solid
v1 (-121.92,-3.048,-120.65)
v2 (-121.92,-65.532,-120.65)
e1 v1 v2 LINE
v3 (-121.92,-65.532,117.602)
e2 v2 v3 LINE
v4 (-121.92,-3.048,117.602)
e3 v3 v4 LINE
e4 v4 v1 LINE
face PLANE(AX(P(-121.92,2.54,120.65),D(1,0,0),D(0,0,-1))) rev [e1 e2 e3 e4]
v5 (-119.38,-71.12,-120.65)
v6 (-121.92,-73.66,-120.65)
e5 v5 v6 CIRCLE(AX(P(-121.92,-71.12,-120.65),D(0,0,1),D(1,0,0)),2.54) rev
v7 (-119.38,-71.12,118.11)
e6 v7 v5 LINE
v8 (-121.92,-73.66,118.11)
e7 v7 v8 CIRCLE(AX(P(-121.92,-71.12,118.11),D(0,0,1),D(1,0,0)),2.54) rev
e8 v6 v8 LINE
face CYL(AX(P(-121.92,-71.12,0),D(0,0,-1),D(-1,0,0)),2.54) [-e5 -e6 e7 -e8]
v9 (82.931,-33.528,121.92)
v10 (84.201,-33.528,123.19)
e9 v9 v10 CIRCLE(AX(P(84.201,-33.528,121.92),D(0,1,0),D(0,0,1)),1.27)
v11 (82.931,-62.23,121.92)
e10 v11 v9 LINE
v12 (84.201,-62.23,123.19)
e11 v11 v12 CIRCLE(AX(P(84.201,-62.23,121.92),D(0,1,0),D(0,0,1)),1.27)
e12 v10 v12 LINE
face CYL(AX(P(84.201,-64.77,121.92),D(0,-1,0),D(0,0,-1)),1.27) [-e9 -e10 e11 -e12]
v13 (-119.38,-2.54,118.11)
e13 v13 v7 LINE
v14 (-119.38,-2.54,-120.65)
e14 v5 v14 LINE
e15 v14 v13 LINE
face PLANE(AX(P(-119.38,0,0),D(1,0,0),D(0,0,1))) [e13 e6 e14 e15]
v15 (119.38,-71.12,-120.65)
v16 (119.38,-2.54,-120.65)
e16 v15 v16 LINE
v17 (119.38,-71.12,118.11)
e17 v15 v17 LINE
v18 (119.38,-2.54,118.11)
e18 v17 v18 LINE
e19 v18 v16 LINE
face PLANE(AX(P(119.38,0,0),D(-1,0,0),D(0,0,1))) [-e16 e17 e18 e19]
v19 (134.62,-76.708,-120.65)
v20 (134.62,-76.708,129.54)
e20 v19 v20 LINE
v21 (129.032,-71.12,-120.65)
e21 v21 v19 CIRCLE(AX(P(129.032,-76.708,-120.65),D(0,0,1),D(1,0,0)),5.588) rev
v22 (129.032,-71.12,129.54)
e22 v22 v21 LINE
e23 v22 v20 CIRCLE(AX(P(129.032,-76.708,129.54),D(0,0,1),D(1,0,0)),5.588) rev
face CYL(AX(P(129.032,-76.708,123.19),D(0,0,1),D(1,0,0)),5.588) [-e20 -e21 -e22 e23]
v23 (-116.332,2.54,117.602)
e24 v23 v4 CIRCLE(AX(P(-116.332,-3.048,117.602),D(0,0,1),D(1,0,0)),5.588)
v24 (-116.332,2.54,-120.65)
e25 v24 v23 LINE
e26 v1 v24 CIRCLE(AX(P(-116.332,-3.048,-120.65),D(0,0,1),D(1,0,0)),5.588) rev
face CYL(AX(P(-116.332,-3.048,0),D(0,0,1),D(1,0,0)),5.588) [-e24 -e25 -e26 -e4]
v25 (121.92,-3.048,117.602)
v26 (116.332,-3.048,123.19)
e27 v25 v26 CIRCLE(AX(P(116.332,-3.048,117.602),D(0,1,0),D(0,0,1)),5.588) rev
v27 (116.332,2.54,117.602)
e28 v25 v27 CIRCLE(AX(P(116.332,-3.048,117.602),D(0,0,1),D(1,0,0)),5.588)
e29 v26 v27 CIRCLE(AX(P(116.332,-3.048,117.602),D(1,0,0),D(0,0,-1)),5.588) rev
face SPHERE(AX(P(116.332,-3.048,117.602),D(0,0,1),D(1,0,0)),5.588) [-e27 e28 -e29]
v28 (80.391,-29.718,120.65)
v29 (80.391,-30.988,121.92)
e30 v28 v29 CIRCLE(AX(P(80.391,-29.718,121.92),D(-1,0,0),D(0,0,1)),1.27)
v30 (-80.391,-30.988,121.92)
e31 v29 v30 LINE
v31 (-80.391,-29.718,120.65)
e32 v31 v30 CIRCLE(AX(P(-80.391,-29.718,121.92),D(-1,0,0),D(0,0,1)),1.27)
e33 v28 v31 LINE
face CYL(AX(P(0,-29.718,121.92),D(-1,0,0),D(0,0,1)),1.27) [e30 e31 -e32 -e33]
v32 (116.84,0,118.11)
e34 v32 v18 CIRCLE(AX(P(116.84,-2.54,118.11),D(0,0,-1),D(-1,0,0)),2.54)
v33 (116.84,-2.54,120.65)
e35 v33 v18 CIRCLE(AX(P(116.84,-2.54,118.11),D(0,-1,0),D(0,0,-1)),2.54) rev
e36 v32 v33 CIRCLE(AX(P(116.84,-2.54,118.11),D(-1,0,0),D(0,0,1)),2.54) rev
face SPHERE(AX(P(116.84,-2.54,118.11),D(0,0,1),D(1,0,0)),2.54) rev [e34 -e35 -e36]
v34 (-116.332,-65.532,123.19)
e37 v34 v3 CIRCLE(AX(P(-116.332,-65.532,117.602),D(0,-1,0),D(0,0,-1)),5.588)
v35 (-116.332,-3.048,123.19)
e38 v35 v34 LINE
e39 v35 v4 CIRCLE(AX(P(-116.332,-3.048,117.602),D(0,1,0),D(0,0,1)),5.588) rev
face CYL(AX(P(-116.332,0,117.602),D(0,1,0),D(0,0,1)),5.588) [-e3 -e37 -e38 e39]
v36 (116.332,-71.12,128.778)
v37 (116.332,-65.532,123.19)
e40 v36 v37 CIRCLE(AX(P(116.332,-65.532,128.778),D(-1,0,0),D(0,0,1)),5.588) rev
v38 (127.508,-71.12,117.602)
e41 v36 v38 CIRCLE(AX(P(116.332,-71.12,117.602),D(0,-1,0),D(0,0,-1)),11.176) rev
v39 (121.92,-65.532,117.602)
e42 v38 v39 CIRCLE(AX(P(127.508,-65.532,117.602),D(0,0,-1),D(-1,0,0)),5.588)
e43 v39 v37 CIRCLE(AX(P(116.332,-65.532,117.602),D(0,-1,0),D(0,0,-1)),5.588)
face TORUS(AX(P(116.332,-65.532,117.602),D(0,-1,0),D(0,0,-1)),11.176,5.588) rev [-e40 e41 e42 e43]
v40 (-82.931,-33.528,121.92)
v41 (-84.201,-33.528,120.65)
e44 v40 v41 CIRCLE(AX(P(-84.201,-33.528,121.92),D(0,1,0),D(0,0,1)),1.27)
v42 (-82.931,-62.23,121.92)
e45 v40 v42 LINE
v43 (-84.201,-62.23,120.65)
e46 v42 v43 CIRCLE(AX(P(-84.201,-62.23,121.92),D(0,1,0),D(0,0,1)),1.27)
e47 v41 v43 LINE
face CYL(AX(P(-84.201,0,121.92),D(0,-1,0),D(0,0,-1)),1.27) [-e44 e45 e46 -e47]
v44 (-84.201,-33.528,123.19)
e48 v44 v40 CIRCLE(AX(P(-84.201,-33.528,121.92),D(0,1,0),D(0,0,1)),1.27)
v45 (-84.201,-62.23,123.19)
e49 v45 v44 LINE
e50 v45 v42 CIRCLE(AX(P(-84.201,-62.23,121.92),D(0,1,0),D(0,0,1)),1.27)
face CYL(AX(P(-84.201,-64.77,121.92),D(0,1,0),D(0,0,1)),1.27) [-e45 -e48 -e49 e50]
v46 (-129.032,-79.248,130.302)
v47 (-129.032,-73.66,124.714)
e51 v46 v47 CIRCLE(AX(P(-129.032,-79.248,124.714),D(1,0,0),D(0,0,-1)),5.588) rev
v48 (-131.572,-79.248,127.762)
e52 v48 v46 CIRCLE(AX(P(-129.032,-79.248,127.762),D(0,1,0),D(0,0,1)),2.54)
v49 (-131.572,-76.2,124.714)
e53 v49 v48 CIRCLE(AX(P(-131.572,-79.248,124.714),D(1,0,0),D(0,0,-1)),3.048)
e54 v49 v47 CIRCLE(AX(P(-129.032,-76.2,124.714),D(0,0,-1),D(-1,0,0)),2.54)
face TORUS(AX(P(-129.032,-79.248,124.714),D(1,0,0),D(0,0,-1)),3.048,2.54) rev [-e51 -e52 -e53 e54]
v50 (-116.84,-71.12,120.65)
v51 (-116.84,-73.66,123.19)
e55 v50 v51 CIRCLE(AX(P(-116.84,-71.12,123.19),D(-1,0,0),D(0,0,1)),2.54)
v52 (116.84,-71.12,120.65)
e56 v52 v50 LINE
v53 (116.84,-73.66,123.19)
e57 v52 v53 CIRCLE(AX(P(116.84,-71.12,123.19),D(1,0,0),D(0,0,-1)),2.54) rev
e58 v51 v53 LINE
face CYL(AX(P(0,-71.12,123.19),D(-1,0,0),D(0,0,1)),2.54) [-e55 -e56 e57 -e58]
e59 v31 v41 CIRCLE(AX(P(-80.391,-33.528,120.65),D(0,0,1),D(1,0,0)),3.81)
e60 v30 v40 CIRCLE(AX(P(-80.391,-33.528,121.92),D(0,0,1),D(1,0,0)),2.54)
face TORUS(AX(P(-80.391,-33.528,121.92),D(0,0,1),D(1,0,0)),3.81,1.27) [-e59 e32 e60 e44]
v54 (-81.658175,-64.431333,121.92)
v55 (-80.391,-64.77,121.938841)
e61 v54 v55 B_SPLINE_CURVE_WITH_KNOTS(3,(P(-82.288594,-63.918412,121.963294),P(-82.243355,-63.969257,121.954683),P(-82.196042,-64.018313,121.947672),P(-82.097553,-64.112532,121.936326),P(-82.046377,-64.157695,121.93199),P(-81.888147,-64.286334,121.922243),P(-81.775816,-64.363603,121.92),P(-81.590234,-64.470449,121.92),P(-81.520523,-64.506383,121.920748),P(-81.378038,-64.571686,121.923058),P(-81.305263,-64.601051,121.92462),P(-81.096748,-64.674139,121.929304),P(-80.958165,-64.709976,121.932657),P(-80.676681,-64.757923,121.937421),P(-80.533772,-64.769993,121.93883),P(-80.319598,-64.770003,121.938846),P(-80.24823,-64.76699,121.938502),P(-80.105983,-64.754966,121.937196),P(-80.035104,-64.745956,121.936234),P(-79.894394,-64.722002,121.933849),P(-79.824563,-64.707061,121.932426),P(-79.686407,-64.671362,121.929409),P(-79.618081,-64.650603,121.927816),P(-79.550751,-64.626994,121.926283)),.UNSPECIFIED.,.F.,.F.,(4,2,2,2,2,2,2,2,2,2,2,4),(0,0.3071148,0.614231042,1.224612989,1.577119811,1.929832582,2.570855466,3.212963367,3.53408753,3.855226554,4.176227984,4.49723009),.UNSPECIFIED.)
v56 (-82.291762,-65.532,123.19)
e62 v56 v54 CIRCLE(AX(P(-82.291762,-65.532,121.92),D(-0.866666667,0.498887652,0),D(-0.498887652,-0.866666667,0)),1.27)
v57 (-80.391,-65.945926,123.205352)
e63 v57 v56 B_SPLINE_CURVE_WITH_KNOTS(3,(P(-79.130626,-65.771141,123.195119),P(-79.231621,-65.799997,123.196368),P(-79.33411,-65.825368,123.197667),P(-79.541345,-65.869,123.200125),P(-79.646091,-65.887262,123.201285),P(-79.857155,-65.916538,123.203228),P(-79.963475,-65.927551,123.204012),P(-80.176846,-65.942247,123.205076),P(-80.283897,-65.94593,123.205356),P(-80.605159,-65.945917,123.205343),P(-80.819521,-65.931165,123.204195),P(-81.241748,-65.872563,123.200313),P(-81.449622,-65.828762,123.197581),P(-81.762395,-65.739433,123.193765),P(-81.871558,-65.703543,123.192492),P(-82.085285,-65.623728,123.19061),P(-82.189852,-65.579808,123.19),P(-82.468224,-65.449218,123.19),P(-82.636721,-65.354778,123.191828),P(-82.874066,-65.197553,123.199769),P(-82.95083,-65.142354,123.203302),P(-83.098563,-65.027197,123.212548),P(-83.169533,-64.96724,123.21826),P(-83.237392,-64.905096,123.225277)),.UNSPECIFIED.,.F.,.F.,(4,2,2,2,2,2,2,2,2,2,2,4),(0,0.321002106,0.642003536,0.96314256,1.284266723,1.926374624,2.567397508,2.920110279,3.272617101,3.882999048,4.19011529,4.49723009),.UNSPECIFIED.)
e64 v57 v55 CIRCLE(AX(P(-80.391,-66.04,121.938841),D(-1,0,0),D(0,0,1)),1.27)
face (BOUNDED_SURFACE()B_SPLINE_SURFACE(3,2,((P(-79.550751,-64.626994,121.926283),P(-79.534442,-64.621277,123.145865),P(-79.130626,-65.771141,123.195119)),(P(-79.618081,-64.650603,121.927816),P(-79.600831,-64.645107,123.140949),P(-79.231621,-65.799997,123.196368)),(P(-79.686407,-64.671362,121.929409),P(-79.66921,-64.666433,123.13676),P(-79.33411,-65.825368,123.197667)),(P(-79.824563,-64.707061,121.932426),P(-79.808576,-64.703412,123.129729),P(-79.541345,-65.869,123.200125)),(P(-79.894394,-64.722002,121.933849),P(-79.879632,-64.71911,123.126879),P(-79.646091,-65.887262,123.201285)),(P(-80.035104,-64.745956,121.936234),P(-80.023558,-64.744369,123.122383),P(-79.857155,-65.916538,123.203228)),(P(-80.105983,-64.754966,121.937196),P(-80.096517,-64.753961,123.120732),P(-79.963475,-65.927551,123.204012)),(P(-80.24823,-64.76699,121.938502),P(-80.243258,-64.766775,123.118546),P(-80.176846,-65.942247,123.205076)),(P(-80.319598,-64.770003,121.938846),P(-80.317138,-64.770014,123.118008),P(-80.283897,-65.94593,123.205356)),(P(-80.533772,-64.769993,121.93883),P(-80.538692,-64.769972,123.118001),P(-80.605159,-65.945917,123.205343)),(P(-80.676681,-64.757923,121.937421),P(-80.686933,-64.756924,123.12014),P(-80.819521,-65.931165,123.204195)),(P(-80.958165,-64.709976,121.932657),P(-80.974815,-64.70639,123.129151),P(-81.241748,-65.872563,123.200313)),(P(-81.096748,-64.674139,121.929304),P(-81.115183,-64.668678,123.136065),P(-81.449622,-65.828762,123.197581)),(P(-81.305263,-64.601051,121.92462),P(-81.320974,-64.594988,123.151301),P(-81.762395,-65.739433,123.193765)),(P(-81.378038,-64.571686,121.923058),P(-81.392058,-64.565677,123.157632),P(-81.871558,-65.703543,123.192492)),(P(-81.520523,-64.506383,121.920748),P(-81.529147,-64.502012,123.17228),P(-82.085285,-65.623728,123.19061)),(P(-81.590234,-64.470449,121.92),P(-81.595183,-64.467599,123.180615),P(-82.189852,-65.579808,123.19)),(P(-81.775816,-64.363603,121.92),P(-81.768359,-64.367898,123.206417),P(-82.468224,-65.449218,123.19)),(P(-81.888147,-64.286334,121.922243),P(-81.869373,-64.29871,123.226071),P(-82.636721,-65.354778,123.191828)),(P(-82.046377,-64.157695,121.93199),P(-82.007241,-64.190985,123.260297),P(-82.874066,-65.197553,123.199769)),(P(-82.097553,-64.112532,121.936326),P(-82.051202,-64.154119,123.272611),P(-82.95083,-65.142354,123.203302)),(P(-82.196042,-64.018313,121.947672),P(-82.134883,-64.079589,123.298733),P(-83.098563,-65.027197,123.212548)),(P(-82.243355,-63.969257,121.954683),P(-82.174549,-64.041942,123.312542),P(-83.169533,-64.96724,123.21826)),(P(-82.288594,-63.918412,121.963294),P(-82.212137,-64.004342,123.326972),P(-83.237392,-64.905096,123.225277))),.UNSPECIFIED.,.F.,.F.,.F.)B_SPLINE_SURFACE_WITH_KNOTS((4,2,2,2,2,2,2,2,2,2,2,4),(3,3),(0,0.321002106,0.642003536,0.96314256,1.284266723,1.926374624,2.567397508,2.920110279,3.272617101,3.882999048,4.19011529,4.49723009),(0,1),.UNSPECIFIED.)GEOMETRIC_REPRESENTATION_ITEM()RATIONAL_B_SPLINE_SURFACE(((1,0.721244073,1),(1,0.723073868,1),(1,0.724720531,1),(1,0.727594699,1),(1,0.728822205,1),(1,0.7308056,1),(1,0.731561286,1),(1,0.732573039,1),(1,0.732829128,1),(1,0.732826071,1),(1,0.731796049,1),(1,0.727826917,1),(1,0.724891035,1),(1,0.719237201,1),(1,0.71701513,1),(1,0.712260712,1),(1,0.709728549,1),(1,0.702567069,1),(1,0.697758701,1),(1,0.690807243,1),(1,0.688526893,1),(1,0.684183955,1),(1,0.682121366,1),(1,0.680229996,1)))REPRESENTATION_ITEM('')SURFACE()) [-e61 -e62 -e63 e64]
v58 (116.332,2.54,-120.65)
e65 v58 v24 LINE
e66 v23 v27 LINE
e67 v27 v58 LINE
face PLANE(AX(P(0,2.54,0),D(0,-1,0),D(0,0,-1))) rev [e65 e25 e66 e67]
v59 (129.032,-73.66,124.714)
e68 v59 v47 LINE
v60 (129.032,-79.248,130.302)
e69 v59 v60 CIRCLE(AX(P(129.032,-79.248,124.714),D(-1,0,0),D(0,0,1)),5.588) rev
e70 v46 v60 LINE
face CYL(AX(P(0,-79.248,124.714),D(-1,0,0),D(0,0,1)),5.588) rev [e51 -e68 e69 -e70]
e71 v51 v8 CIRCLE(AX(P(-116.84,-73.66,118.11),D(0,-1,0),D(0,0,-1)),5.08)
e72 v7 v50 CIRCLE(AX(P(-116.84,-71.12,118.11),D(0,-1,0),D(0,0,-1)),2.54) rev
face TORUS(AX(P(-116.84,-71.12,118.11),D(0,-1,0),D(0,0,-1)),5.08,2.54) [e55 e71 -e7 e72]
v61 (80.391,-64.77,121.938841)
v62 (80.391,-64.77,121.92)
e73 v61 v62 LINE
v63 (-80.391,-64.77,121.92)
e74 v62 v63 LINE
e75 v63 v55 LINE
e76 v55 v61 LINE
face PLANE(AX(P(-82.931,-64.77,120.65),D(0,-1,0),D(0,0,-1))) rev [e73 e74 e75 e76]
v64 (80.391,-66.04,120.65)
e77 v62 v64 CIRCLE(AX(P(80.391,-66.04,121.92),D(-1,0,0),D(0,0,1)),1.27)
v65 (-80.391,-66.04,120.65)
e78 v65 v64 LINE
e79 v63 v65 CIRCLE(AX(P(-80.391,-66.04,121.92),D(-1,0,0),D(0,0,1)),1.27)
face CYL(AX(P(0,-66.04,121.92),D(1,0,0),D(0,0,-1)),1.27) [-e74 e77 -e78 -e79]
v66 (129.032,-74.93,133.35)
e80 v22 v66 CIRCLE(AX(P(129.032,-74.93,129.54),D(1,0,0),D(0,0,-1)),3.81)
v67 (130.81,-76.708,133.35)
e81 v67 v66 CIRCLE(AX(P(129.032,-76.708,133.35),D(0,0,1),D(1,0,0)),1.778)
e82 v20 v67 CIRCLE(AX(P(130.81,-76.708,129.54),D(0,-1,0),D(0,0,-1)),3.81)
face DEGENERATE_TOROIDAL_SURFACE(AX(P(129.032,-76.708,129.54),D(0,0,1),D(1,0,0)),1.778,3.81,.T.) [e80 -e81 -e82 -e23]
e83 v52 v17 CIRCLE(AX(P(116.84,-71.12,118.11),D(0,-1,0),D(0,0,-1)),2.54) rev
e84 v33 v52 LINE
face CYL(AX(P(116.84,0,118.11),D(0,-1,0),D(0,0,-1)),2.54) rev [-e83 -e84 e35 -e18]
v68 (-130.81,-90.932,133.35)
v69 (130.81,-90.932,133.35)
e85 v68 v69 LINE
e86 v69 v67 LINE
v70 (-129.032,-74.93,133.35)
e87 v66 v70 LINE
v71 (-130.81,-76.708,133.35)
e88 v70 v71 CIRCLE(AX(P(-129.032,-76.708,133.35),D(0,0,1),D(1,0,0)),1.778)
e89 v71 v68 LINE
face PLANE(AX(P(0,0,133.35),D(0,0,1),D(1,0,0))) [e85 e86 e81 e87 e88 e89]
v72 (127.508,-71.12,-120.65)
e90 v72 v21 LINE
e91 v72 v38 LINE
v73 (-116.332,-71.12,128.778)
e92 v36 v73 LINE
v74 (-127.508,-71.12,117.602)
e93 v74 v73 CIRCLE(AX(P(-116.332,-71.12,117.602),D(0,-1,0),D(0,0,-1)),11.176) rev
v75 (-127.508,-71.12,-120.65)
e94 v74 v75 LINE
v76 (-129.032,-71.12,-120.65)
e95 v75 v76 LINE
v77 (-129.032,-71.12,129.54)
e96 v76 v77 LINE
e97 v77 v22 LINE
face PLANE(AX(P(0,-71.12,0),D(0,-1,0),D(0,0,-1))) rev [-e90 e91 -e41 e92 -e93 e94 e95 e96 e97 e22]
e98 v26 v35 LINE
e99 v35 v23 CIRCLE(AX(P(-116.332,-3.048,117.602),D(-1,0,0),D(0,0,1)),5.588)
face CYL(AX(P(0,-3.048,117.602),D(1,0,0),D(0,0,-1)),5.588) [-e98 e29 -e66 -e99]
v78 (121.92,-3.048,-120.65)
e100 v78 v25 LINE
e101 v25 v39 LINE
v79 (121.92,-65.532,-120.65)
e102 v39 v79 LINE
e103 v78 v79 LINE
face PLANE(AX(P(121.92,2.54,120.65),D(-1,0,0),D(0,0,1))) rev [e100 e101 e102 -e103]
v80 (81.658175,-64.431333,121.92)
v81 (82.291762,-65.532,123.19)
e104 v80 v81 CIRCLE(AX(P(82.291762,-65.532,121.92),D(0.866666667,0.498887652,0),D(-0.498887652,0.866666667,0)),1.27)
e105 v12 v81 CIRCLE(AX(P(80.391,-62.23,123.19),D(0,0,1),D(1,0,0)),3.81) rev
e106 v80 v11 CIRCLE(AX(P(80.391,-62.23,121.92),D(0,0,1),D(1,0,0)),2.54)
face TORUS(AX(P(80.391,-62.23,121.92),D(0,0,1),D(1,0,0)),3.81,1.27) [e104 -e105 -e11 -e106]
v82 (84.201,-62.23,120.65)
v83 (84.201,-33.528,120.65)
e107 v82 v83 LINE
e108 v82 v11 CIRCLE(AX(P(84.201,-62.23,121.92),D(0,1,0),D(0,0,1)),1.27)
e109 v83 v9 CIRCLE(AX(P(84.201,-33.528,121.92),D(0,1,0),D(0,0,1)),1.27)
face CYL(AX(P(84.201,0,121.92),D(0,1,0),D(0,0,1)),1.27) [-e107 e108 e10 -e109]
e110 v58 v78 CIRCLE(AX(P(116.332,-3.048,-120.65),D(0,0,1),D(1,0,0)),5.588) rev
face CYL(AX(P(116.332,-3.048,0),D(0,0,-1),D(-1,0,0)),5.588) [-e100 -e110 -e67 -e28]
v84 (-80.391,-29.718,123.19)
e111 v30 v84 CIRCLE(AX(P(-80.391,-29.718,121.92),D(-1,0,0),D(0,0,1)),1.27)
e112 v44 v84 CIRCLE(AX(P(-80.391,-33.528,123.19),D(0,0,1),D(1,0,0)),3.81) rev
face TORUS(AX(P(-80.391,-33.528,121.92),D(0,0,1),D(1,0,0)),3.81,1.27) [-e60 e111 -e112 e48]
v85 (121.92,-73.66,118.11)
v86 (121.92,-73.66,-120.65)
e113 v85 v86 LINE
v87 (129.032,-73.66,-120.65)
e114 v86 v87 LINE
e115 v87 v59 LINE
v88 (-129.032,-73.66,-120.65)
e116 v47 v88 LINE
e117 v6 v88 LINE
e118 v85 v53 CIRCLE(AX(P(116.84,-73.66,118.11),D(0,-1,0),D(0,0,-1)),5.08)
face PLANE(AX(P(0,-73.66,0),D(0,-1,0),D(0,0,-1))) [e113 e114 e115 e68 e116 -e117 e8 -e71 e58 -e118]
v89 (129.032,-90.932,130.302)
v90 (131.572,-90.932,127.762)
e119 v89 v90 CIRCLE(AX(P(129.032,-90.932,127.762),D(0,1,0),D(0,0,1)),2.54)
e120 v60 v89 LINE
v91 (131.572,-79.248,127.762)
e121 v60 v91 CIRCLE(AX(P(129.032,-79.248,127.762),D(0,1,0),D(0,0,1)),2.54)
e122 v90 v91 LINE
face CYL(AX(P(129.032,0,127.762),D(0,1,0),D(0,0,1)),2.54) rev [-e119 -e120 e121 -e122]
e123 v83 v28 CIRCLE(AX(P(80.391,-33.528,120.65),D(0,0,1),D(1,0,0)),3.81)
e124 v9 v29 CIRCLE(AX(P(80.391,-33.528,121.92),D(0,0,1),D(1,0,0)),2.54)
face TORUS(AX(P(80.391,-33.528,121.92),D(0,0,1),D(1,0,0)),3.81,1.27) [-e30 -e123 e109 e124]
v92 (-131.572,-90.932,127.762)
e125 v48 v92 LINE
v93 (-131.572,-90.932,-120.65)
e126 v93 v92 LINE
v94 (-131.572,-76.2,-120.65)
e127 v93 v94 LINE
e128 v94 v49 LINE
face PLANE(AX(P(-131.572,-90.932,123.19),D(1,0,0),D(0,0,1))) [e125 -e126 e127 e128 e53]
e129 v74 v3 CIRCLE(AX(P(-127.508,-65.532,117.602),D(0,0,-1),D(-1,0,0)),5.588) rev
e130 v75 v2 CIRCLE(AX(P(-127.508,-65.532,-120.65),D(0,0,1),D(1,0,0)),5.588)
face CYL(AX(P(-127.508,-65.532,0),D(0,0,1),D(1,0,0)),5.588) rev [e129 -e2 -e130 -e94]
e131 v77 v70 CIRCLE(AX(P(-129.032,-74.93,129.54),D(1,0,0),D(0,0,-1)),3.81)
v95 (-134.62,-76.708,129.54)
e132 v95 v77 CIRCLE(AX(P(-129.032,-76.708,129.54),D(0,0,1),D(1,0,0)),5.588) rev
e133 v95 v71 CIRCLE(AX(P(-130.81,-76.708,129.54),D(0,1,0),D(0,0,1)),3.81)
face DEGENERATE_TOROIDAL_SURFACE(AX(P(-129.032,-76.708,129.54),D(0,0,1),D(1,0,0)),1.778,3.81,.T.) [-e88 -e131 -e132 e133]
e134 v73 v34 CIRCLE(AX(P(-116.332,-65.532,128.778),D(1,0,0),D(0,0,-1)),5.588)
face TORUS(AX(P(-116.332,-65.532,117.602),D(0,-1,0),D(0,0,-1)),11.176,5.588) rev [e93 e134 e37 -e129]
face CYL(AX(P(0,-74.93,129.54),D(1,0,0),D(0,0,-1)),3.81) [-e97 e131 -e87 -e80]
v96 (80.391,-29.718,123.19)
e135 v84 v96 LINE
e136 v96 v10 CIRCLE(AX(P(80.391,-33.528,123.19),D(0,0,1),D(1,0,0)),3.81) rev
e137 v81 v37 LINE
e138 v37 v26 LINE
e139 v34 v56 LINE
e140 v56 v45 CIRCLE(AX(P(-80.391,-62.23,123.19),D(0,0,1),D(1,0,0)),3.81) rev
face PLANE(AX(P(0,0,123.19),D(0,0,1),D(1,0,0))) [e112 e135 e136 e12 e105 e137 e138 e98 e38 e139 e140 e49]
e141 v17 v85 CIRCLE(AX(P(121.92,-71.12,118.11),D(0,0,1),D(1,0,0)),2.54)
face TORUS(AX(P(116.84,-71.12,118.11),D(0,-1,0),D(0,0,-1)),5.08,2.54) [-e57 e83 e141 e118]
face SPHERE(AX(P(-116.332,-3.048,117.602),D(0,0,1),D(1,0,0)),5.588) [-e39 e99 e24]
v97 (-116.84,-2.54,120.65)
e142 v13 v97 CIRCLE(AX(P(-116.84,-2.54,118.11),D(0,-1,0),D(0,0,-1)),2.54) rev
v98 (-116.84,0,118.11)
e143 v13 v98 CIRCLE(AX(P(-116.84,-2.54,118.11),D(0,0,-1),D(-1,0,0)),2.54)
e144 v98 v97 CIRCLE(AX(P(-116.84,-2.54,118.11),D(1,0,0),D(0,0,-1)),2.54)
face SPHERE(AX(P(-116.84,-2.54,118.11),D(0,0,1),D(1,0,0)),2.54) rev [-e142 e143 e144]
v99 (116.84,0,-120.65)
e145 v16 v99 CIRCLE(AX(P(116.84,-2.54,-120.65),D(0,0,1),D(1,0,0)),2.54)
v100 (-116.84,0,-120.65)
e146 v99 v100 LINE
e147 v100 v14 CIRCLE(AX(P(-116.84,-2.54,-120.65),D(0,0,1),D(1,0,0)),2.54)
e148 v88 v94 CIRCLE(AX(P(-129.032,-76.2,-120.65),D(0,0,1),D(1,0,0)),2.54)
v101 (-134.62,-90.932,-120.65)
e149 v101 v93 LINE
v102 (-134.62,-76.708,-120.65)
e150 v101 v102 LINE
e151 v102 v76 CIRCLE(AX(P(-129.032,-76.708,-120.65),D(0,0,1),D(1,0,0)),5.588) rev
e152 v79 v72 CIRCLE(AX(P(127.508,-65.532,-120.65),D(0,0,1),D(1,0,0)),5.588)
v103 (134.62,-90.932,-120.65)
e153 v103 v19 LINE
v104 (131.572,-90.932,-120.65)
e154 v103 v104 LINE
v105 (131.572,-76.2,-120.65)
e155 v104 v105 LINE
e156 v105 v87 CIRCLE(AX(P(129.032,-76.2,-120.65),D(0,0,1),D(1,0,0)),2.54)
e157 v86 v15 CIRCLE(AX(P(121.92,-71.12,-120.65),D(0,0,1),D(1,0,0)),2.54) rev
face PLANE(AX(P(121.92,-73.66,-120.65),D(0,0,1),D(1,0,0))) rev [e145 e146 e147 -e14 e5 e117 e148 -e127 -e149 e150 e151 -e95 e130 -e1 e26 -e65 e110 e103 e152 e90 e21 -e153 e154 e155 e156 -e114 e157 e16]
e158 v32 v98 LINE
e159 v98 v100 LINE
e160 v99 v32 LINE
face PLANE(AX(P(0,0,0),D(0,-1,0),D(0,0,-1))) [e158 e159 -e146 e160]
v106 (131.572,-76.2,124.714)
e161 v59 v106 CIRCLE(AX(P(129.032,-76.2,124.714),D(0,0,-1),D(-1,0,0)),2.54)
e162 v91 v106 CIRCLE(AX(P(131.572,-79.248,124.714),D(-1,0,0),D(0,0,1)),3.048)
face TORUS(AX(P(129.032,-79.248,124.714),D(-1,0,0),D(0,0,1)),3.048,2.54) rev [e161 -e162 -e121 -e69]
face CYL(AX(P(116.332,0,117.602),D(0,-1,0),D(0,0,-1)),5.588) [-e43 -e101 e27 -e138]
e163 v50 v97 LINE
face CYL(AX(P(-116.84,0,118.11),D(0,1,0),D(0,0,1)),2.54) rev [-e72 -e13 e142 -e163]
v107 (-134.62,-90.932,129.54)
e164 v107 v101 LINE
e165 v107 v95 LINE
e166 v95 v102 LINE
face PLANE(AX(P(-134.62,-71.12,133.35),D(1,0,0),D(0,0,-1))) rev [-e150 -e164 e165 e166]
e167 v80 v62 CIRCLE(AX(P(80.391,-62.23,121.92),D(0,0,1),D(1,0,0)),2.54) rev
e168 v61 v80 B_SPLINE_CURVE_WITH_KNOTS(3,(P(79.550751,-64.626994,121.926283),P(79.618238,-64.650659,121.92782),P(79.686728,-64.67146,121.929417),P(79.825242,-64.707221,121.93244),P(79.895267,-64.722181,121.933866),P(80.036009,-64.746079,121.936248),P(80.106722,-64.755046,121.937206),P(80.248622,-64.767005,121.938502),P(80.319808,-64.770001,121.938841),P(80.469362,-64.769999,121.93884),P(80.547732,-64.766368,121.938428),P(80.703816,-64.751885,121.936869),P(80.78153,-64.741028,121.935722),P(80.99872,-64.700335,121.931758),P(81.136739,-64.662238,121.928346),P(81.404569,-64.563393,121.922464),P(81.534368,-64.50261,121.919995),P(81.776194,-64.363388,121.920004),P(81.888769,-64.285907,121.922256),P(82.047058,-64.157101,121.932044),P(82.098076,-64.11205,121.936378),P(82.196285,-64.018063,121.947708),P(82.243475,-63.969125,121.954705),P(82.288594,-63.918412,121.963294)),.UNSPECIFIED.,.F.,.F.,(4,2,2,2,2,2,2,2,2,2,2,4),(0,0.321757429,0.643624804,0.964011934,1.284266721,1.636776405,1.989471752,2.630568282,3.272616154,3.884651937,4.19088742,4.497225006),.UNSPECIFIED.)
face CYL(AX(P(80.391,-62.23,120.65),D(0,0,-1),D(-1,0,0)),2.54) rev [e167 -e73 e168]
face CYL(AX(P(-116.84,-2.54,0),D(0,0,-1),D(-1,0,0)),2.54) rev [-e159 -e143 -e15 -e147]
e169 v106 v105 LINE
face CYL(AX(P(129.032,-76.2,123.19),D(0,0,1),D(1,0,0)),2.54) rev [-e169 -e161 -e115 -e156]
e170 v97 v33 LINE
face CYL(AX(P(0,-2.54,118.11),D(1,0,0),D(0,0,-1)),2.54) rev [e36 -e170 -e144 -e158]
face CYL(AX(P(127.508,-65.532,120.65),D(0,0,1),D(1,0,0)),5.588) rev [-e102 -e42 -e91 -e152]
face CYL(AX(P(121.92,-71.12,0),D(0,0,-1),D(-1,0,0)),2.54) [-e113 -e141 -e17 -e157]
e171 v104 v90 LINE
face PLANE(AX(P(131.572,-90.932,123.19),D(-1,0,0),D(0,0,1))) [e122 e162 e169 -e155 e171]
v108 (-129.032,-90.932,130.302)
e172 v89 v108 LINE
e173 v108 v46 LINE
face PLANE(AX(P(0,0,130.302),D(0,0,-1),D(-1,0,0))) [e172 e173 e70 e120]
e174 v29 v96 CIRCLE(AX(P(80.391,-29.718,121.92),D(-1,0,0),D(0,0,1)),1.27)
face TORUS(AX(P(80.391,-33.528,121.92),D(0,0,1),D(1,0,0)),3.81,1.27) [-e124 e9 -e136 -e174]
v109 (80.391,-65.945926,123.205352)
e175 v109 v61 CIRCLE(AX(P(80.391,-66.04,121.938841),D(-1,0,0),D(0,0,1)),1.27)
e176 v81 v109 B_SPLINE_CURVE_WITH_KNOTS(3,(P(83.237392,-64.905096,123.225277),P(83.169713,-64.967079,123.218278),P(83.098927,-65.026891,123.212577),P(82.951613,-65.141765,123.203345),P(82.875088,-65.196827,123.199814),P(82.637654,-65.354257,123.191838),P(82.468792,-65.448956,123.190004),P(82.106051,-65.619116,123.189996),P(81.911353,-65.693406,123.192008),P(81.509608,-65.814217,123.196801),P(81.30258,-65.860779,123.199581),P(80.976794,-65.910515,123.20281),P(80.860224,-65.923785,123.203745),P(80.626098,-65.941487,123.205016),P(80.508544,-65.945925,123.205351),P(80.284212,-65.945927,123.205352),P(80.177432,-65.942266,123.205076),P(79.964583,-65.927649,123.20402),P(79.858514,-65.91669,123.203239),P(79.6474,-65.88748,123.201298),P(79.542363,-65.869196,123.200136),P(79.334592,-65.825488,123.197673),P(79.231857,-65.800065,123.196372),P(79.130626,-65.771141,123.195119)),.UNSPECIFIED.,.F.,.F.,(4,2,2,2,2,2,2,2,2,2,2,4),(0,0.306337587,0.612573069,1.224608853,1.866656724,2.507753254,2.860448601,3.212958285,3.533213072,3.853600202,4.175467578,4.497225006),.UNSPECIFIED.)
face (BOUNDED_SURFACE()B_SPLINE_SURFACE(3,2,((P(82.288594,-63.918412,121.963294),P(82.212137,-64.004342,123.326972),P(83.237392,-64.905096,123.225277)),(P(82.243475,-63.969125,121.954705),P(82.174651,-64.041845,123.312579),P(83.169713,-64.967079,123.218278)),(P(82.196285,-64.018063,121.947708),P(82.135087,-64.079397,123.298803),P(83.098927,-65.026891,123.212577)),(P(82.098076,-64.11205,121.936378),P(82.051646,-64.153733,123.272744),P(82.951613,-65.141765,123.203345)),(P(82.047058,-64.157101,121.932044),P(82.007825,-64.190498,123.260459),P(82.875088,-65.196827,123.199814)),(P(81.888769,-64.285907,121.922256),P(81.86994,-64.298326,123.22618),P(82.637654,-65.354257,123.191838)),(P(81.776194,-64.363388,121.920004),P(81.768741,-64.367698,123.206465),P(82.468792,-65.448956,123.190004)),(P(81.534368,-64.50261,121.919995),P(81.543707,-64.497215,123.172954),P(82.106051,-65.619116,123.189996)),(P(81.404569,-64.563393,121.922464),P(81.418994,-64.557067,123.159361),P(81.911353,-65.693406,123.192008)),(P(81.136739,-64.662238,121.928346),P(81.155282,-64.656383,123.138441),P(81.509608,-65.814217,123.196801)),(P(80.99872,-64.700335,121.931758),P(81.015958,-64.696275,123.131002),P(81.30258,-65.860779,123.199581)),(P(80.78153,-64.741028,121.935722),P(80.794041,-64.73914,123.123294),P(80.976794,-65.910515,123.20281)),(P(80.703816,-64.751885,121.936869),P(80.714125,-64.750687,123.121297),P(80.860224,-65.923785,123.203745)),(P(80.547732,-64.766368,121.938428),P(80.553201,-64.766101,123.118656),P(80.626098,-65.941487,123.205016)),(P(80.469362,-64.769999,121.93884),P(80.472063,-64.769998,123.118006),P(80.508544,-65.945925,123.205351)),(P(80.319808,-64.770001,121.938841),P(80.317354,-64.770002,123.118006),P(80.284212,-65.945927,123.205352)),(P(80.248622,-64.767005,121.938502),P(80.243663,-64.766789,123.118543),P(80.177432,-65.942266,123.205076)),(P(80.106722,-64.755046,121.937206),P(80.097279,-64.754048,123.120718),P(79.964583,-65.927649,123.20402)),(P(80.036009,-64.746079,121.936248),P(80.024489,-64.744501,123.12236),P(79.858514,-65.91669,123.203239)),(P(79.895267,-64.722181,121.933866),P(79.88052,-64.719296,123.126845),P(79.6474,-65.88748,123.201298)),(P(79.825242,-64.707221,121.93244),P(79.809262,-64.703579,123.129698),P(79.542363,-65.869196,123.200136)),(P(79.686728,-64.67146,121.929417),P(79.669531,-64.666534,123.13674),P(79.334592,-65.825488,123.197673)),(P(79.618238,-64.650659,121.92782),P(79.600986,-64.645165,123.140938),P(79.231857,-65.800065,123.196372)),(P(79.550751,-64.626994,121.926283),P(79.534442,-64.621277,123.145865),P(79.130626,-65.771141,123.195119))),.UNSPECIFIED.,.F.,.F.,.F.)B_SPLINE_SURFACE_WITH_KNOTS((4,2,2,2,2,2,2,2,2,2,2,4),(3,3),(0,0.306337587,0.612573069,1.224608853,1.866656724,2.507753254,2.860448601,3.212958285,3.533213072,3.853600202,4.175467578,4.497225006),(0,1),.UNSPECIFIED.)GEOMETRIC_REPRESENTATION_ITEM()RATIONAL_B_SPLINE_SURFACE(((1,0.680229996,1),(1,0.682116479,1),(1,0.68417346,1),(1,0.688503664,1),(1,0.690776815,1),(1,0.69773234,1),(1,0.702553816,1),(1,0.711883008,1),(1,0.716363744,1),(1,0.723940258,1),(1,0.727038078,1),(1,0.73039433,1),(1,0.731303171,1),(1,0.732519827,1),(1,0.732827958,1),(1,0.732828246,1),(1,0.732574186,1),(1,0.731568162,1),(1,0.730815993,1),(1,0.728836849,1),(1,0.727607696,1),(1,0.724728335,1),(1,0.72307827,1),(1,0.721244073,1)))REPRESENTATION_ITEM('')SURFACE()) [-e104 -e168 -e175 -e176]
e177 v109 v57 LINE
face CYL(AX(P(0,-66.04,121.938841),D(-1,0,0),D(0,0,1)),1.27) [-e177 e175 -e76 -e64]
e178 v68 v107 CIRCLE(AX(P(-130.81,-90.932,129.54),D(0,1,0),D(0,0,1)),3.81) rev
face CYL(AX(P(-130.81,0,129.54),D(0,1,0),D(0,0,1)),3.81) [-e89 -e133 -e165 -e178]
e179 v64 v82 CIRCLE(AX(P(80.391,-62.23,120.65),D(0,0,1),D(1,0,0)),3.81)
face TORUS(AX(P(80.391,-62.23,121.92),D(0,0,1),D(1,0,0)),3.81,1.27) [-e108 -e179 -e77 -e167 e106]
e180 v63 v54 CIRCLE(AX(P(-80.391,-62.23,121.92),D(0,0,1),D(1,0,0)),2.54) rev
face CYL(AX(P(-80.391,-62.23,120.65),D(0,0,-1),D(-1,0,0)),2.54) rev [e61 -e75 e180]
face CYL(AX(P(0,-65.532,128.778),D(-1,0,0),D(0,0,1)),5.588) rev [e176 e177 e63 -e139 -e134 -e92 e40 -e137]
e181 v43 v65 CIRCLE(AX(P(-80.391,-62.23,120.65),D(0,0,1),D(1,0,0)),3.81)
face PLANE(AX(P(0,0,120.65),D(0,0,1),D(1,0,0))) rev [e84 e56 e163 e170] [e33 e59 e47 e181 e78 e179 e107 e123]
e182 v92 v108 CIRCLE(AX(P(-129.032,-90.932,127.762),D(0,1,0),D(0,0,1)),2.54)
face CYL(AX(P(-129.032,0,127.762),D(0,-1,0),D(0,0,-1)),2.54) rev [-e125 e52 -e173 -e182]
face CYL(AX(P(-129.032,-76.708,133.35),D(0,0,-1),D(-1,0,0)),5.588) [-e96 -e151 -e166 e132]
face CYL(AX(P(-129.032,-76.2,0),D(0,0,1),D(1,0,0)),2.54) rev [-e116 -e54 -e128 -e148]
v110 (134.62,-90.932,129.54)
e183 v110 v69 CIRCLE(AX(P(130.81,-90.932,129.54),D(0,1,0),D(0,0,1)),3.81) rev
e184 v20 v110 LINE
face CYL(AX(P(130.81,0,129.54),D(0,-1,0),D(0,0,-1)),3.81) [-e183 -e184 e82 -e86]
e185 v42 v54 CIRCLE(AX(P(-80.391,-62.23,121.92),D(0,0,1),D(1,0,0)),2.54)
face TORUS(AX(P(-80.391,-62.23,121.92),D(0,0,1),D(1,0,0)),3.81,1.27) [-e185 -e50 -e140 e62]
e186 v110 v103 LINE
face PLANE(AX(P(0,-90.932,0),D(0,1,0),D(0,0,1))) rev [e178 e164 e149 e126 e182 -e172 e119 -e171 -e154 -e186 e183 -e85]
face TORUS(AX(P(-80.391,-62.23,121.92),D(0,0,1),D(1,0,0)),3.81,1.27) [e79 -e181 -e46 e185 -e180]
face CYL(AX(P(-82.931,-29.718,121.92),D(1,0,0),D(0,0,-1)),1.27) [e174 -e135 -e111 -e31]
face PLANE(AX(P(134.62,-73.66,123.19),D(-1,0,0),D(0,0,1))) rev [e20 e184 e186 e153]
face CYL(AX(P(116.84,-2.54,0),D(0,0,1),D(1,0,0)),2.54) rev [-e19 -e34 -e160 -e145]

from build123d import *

# Parameters (mm, degrees)
SKETCH1_W            = 243.84
SKETCH1_H            = 241.3
BOSS_EXTRUDE1_DEPTH  = 2.54
SKETCH2_W            = 241.3
SKETCH2_H            = 76.2
BOSS_EXTRUDE2_DEPTH  = 2.54
SKETCH3_W            = 243.84
SKETCH3_H            = 76.2
BOSS_EXTRUDE3_DEPTH  = 2.54
SKETCH6_W            = 165.862
SKETCH6_H            = 33.782
CUT_EXTRUDE3_DEPTH   = 2.54
SKETCH22_W           = 12.7
SKETCH22_H           = 243.84
BOSS_EXTRUDE8_DEPTH  = 2.54
SKETCH24_W           = 3.048
SKETCH24_H           = 243.84
BOSS_EXTRUDE10_DEPTH = 19.812
SKETCH27_W           = 269.24
SKETCH27_H           = 19.812
BOSS_EXTRUDE11_DEPTH = 12.7
SKETCH28_W           = 263.144
SKETCH28_H           = 17.272
CUT_EXTRUDE6_DEPTH   = 9.652
FILLET4_R            = 5.588
FILLET5_R            = 2.54
FILLET6_R            = 3.81
FILLET7_R            = 2.54
FILLET8_R            = 1.27


with BuildPart() as part:
    # Sketch1 → Boss-Extrude1 (new body)
    with BuildSketch(Plane(origin=(0, 0, 0), x_dir=(1, 0, 0), z_dir=(0, 1, 0))):
        Rectangle(SKETCH1_W, SKETCH1_H)
    extrude(amount=BOSS_EXTRUDE1_DEPTH)

    # Sketch2 → Boss-Extrude2 (add)
    with BuildSketch(Plane(origin=(121.92, 0, 0), x_dir=(0, 0, -1), z_dir=(1, 0, 0))):
        with Locations((0, -35.56)):
            Rectangle(SKETCH2_W, SKETCH2_H)
    boss_extrude2 = extrude(amount=-BOSS_EXTRUDE2_DEPTH)

    # Sketch3 → Boss-Extrude3 (add)
    with BuildSketch(Plane.XY.offset(120.65)):
        with Locations((0, -35.56)):
            Rectangle(SKETCH3_W, SKETCH3_H)
    extrude(amount=BOSS_EXTRUDE3_DEPTH)

    # Sketch6 → Cut-Extrude3 (cut)
    with BuildSketch(Plane.XY.offset(123.19)):
        with Locations((0, -47.879)):
            Rectangle(SKETCH6_W, SKETCH6_H)
    extrude(amount=-CUT_EXTRUDE3_DEPTH, mode=Mode.SUBTRACT)

    # Mirror15: Boss-Extrude2 across plane
    add(boss_extrude2.mirror(Plane.ZY))


with BuildPart() as body_2:
    # Sketch22 → Boss-Extrude8 (new body)
    with BuildSketch(Plane(origin=(0, -71.12, 0), x_dir=(-1, 0, 0), z_dir=(0, -1, 0))):
        with Locations((-128.27, -1.27)):
            Rectangle(SKETCH22_W, SKETCH22_H)
    boss_extrude8 = extrude(amount=BOSS_EXTRUDE8_DEPTH)

    # Sketch24 → Boss-Extrude10 (add)
    with BuildSketch(Plane(origin=(0, -71.12, 0), x_dir=(1, 0, 0), z_dir=(0, 1, 0))):
        with Locations((133.096, -1.27)):
            Rectangle(SKETCH24_W, SKETCH24_H)
    boss_extrude10 = extrude(amount=-BOSS_EXTRUDE10_DEPTH)


with BuildPart() as part_1:
    add(part.part)

    # Mirror18: Boss-Extrude8, Boss-Extrude10 across plane
    add(boss_extrude8.mirror(Plane.ZY))
    add(boss_extrude10.mirror(Plane.ZY))

    add(body_2.part)  # Boss-Extrude11 merges body 2
    # Sketch27 → Boss-Extrude11 (add)
    with BuildSketch(Plane.XY.offset(120.65)):
        with Locations((0, -81.026)):
            Rectangle(SKETCH27_W, SKETCH27_H)
    extrude(amount=BOSS_EXTRUDE11_DEPTH)

    # Sketch28 → Cut-Extrude6 (cut)
    with BuildSketch(Plane(origin=(0, 0, 120.65), x_dir=(-1, 0, 0), z_dir=(0, 0, -1))):
        with Locations((0, -82.296)):
            Rectangle(SKETCH28_W, SKETCH28_H)
    extrude(amount=-CUT_EXTRUDE6_DEPTH, mode=Mode.SUBTRACT)

    # Fillet4
    fillet4_edges = [part_1.edges().sort_by_distance(p)[0] for p in [
        (-121.92, -71.12, 1.27),
        (-121.92, 2.54, 1.27),
        (0, -71.12, 123.19),
        (0, 2.54, 123.19),
        (-134.62, -71.12, 6.35),
        (134.62, -71.12, 6.35),
        (0, -73.66, 130.302),
        (121.92, -71.12, 1.27),
        (121.92, 2.54, 1.27),
        (121.92, -34.29, 123.19),
        (-121.92, -34.29, 123.19),
    ]]
    fillet(fillet4_edges, radius=FILLET4_R)

    # Fillet5
    fillet5_edges = [part_1.edges().sort_by_distance(p)[0] for p in [
        (-131.572, -85.09, 130.302),
        (0, -73.66, 120.65),
        (131.572, -85.09, 130.302),
        (131.572, -73.66, 2.032),
        (131.572, -75.296687307, 128.665312693),
        (-131.572, -73.66, 2.032),
        (-131.572, -75.296687307, 128.665312693),
        (119.38, -36.83, 120.65),
        (-119.38, -36.83, 120.65),
        (0, 0, 120.65),
        (119.38, -73.66, 0),
        (119.38, 0, 0),
        (-119.38, 0, 0),
        (-119.38, -73.66, 0),
    ]]
    fillet(fillet5_edges, radius=FILLET5_R)

    # Fillet6
    fillet6_edges = [part_1.edges().sort_by_distance(p)[0] for p in [
        (0, -71.12, 133.35),
        (-134.62, -83.82, 133.35),
        (132.983312693, -72.756687307, 133.35),
        (-132.983312693, -72.756687307, 133.35),
        (134.62, -83.82, 133.35),
    ]]
    fillet(fillet6_edges, radius=FILLET6_R)

    # Fillet7
    fillet7_edges = [part_1.edges().sort_by_distance(p)[0] for p in [
        (82.931, -64.77, 121.92),
        (-82.931, -64.77, 121.92),
        (-82.931, -30.988, 121.92),
        (82.931, -30.988, 121.92),
    ]]
    fillet(fillet7_edges, radius=FILLET7_R)

    # Fillet8
    fillet8_edges = [part_1.edges().sort_by_distance(p)[0] for p in [
        (-82.187051224, -31.731948776, 120.65),
        (0, -30.988, 120.65),
        (82.187051224, -31.731948776, 120.65),
        (82.931, -47.879, 120.65),
        (82.187051224, -64.026051224, 120.65),
        (0, -64.77, 120.65),
        (-82.187051224, -64.026051224, 120.65),
        (-82.187051224, -31.731948776, 123.19),
        (0, -30.988, 123.19),
        (82.187051224, -31.731948776, 123.19),
        (82.931, -47.879, 123.19),
        (82.187051224, -64.026051224, 123.19),
        (0, -64.77, 123.19),
        (-82.187051224, -64.026051224, 123.19),
        (-82.931, -47.879, 120.65),
        (-82.931, -47.879, 123.19),
    ]]
    fillet(fillet8_edges, radius=FILLET8_R - 0.0001)  # a hair under: the kernel refuses the full size


solid = part_1.part
